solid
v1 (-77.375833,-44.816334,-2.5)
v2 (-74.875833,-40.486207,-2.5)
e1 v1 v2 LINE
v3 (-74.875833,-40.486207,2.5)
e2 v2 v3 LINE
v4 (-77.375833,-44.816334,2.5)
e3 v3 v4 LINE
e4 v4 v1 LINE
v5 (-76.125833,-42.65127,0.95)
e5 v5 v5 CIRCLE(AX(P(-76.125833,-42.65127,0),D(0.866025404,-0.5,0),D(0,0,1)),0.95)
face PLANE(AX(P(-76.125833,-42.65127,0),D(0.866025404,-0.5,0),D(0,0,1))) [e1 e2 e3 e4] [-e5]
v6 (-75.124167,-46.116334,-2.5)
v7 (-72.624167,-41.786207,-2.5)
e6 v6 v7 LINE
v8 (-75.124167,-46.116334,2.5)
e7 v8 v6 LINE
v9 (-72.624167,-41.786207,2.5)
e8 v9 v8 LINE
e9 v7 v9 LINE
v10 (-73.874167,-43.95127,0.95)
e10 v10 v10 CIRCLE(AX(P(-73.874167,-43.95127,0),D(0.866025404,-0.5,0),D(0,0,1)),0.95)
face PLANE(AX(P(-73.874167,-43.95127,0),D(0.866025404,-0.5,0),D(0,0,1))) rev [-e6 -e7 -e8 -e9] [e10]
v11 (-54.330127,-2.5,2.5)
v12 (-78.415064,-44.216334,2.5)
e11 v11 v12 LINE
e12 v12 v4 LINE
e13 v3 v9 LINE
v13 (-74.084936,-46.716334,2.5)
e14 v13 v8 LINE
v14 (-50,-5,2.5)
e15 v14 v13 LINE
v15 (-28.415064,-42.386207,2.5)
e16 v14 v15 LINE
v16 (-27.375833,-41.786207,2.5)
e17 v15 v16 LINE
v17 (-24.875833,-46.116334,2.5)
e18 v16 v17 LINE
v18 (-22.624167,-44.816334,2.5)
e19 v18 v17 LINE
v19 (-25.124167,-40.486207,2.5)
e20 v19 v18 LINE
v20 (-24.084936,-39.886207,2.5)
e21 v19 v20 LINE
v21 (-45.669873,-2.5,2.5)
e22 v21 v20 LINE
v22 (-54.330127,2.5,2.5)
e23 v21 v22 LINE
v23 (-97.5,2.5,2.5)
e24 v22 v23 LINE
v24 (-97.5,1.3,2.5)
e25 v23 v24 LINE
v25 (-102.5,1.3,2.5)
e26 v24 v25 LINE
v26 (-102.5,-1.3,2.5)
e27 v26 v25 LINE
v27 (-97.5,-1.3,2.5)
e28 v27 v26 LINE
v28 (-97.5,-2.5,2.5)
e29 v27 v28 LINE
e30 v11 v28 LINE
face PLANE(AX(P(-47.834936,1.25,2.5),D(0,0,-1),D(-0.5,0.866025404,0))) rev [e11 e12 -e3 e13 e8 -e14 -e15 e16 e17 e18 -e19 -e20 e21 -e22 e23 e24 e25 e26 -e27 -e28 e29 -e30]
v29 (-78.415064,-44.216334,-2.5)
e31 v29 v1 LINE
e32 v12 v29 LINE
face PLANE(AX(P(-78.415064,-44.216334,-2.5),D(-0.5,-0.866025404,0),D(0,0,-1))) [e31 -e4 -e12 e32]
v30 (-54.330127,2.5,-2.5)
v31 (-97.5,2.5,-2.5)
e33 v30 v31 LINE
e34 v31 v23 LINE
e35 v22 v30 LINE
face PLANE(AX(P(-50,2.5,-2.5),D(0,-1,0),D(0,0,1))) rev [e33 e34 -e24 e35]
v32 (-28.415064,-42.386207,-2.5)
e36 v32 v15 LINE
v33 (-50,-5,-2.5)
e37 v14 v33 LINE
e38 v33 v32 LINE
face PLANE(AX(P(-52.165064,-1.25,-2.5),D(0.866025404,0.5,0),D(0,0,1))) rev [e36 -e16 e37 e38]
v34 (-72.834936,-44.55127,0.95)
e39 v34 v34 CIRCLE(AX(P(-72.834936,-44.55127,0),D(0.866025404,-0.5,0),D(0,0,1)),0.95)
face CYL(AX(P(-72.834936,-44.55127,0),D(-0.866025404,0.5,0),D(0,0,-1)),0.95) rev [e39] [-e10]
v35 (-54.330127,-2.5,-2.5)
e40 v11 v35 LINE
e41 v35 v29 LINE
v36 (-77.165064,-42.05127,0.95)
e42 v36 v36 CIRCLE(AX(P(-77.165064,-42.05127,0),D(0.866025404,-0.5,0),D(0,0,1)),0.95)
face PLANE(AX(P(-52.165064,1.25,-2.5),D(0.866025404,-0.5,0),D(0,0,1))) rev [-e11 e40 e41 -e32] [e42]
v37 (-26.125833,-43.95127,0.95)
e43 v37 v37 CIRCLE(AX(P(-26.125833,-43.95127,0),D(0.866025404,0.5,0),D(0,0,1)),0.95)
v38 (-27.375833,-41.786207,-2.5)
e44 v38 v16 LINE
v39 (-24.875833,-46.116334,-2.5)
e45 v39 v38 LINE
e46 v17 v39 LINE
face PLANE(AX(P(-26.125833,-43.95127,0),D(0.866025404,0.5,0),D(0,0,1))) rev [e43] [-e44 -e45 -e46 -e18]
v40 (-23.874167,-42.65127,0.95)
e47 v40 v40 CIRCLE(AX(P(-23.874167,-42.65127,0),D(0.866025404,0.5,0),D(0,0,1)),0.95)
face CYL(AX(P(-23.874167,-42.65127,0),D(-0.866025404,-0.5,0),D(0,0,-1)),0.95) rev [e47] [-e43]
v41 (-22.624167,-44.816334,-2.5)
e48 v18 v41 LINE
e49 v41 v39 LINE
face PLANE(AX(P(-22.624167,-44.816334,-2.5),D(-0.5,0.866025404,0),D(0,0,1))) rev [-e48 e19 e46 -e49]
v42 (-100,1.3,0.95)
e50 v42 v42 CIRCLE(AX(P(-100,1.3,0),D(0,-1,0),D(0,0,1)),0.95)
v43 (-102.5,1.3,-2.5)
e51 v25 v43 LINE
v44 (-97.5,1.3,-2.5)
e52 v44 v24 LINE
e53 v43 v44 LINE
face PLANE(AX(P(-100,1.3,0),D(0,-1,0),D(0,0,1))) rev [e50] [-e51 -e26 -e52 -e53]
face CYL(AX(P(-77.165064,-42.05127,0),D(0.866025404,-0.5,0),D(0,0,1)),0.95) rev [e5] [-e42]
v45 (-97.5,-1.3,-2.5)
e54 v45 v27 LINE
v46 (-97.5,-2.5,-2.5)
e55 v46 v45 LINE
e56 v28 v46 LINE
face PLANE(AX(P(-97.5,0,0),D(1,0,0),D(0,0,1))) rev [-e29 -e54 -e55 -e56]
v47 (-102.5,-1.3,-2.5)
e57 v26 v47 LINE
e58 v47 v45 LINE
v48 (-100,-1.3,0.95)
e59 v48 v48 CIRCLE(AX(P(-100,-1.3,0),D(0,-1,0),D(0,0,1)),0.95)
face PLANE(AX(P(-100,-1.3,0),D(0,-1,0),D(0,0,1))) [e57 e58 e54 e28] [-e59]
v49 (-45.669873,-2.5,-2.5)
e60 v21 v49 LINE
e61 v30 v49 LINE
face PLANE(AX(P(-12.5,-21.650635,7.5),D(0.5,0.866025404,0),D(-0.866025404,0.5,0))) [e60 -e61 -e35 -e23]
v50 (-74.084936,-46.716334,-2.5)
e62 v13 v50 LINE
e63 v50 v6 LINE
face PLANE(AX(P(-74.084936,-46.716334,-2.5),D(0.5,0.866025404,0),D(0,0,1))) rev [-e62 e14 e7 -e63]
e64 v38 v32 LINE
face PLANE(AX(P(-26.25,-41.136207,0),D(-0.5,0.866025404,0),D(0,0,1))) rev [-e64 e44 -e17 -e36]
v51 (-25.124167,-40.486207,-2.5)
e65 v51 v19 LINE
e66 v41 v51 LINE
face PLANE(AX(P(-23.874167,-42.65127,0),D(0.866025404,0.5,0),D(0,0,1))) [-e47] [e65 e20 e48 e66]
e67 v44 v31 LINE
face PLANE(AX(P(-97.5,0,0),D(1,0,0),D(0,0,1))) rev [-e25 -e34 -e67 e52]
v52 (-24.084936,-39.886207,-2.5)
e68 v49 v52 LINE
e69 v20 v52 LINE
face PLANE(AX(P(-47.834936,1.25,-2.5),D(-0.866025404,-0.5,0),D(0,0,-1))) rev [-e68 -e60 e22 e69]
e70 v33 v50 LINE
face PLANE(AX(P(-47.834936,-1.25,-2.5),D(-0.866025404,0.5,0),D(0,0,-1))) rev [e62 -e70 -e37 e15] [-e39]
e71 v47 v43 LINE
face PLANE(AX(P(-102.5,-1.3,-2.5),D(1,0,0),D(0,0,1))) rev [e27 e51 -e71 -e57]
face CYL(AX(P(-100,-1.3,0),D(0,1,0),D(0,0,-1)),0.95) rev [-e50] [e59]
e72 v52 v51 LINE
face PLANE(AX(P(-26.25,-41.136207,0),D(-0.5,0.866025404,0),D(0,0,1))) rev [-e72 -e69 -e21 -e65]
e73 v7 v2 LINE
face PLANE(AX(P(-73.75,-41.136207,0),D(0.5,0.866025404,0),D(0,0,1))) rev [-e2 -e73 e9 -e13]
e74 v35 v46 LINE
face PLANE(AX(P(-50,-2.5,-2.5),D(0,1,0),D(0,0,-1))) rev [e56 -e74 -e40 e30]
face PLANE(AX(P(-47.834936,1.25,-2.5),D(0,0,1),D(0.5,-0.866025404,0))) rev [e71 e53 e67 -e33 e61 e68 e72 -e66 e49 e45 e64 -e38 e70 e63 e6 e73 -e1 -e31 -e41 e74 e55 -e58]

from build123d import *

# Parameters (mm, degrees)
SKETCH1_W               = 5
SKETCH1_H               = 5
SKETCH1_R               = 0.95
CENTER_DEPTH            = 1.3
RIGHTSIDE_START         = 1.3
SKETCH1_2_W             = 5
SKETCH1_2_H             = 5
SKETCH1_2_R             = 0.95
RIGHTSIDE_DEPTH         = 1.2
LEFTSIDE_START          = -1.3
SKETCH1_3_W             = 5
SKETCH1_3_H             = 5
SKETCH1_3_R             = 0.95
LEFTSIDE_DEPTH          = 1.2
SKETCH3_W               = 5
SKETCH3_H               = 5
BOSS_EXTRUDE4_DEPTH     = 47.5
CUT_EXTRUDE1_DEPTH      = 5
CIRPATTERN2_COUNT       = 6
CIRPATTERN3_COUNT       = 3
CIRPATTERN4_START       = -44.601270189
CIRPATTERN4_OUTLINE_W   = 5
CIRPATTERN4_OUTLINE_H   = 5
CIRPATTERN4_OUTLINE_R   = 0.95
CIRPATTERN4_DEPTH       = 2.6
CIRPATTERN4_2_OUTLINE_W = 5
CIRPATTERN4_2_OUTLINE_H = 5
CIRPATTERN4_2_OUTLINE_R = 0.95
CIRPATTERN4_2_DEPTH     = 2.6
CIRPATTERN4_START_2     = -1.3
CIRPATTERN4_3_OUTLINE_W = 5
CIRPATTERN4_3_OUTLINE_H = 5
CIRPATTERN4_3_OUTLINE_R = 0.95
CIRPATTERN4_3_DEPTH     = 2.6
SKETCH5_W               = 5
SKETCH5_H               = 2.6
CUT_EXTRUDE2_DEPTH      = 5


# Read off the part's stored shape, not the designer's step: CirPattern4
with BuildPart() as part:
    # Sketch1 → Center (new, symmetric)
    with BuildSketch(Plane(origin=(0, 0, 0), x_dir=(1, 0, 0), z_dir=(0, 1, 0))):
        Rectangle(SKETCH1_W, SKETCH1_H)
        with Locations(Location((0, 0, 0), (0, 0, 270))):
            Circle(SKETCH1_R, mode=Mode.SUBTRACT)
    extrude(amount=CENTER_DEPTH, both=True)

    # Sketch5 → Cut-Extrude2 (cut)
    with BuildSketch(Plane(origin=(2.5, 0, 0), x_dir=(0, 0, -1), z_dir=(1, 0, 0))):
        Rectangle(SKETCH5_W, SKETCH5_H)
    extrude(amount=-CUT_EXTRUDE2_DEPTH, mode=Mode.SUBTRACT)


with BuildPart() as body_2:
    # Sketch1<2> → RightSide (new body)
    with BuildSketch(Plane(origin=(0, 0, 0), x_dir=(1, 0, 0), z_dir=(0, 1, 0)).offset(RIGHTSIDE_START)):
        Rectangle(SKETCH1_2_W, SKETCH1_2_H)
        with Locations(Location((0, 0, 0), (0, 0, 270))):
            Circle(SKETCH1_2_R, mode=Mode.SUBTRACT)
    extrude(amount=RIGHTSIDE_DEPTH)


with BuildPart() as body_3:
    # Sketch1<3> → LeftSide (new body)
    with BuildSketch(Plane(origin=(0, 0, 0), x_dir=(1, 0, 0), z_dir=(0, 1, 0)).offset(LEFTSIDE_START)):
        Rectangle(SKETCH1_3_W, SKETCH1_3_H)
        with Locations(Location((0, 0, 0), (0, 0, 270))):
            Circle(SKETCH1_3_R, mode=Mode.SUBTRACT)
    extrude(amount=-LEFTSIDE_DEPTH)


with BuildPart() as body_4:
    # Sketch3 → Boss-Extrude4 (new body)
    with BuildSketch(Plane.ZY.offset(2.5)):
        Rectangle(SKETCH3_W, SKETCH3_H)
    extrude(amount=BOSS_EXTRUDE4_DEPTH)

    # Sketch4 → Cut-Extrude1 (cut)
    with BuildSketch(Plane.XY.offset(-2.5)):
        Polygon((-50, 0), (-50, -2.5), (-45.669872981, -2.5), align=None)
        Polygon((-50, 2.5), (-50, 0), (-45.669872981, 2.5), align=None)
    extrude(amount=CUT_EXTRUDE1_DEPTH, mode=Mode.SUBTRACT)


with BuildPart() as cirpattern2_1:
    # CirPattern2: pattern copy
    add(body_4.part.rotate(Axis((-50, 0, 0), (0, 0, 1)), 1 * 360 / CIRPATTERN2_COUNT))


with BuildPart() as cirpattern2_2:
    # CirPattern2: pattern copy
    add(body_4.part.rotate(Axis((-50, 0, 0), (0, 0, 1)), 2 * 360 / CIRPATTERN2_COUNT))


with BuildPart() as cirpattern2_3:
    # CirPattern2: pattern copy
    add(body_4.part.rotate(Axis((-50, 0, 0), (0, 0, 1)), 3 * 360 / CIRPATTERN2_COUNT))


with BuildPart() as cirpattern2_4:
    # CirPattern2: pattern copy
    add(body_4.part.rotate(Axis((-50, 0, 0), (0, 0, 1)), 4 * 360 / CIRPATTERN2_COUNT))


with BuildPart() as cirpattern2_5:
    # CirPattern2: pattern copy
    add(body_4.part.rotate(Axis((-50, 0, 0), (0, 0, 1)), 5 * 360 / CIRPATTERN2_COUNT))


with BuildPart() as cirpattern3_1:
    # CirPattern3: pattern copy
    add(body_3.part.rotate(Axis((-50, 0, 0), (0, 0, 1)), 1 * 360 / CIRPATTERN3_COUNT))


with BuildPart() as cirpattern3_2:
    # CirPattern3: pattern copy
    add(body_3.part.rotate(Axis((-50, 0, 0), (0, 0, 1)), 2 * 360 / CIRPATTERN3_COUNT))


with BuildPart() as cirpattern3_3:
    # CirPattern3: pattern copy
    add(body_2.part.rotate(Axis((-50, 0, 0), (0, 0, 1)), 1 * 360 / CIRPATTERN3_COUNT))


with BuildPart() as cirpattern3_4:
    # CirPattern3: pattern copy
    add(body_2.part.rotate(Axis((-50, 0, 0), (0, 0, 1)), 2 * 360 / CIRPATTERN3_COUNT))


with BuildPart() as body_14:
    # CirPattern4 outline → CirPattern4 (new body)
    with BuildSketch(Plane(origin=(0, 0, 0), x_dir=(0.49999999999999767, 0.86602540378444, 0), z_dir=(0.8660254037844399, -0.49999999999999795, 0)).offset(CIRPATTERN4_START)):
        with Locations((25, 0)):
            Rectangle(CIRPATTERN4_OUTLINE_W, CIRPATTERN4_OUTLINE_H)
        with Locations((25, 0)):
            Circle(CIRPATTERN4_OUTLINE_R, mode=Mode.SUBTRACT)
    extrude(amount=CIRPATTERN4_DEPTH)


with BuildPart() as body_15:
    # CirPattern4 2 outline → CirPattern4 2 (new body)
    with BuildSketch(Plane(origin=(0, 0, 0), x_dir=(0.5000000000000098, -0.8660254037844329, 0), z_dir=(0.8660254037844329, 0.50000000000001, 0)).offset(CIRPATTERN4_START)):
        with Locations((25, 0)):
            Rectangle(CIRPATTERN4_2_OUTLINE_W, CIRPATTERN4_2_OUTLINE_H)
        with Locations((25, 0)):
            Circle(CIRPATTERN4_2_OUTLINE_R, mode=Mode.SUBTRACT)
    extrude(amount=CIRPATTERN4_2_DEPTH)


with BuildPart() as body_16:
    # CirPattern4 3 outline → CirPattern4 3 (new body)
    with BuildSketch(Plane(origin=(0, 0, 0), x_dir=(1, 0, 0), z_dir=(0, 1, 0)).offset(CIRPATTERN4_START_2)):
        with Locations((-100, 0)):
            Rectangle(CIRPATTERN4_3_OUTLINE_W, CIRPATTERN4_3_OUTLINE_H)
        with Locations((-100, 0)):
            Circle(CIRPATTERN4_3_OUTLINE_R, mode=Mode.SUBTRACT)
    extrude(amount=CIRPATTERN4_3_DEPTH)


with BuildPart() as cirpattern2_5_1:
    add(cirpattern2_5.part)

    # Combine1: union CirPattern2_3, CirPattern2_4, body 16, CirPattern3_2, CirPattern3_4, body 15
    add(cirpattern2_3.part)
    add(cirpattern2_4.part)
    add(body_16.part)
    add(cirpattern3_2.part)
    add(cirpattern3_4.part)
    add(body_15.part)

    # Combine3: cut CirPattern3_3, body 14, CirPattern2_1, body 4, body 2, CirPattern2_2, body 3, CirPattern3_1
    add(cirpattern3_3.part, mode=Mode.SUBTRACT)
    add(body_14.part, mode=Mode.SUBTRACT)
    add(cirpattern2_1.part, mode=Mode.SUBTRACT)
    add(body_4.part, mode=Mode.SUBTRACT)
    add(body_2.part, mode=Mode.SUBTRACT)
    add(cirpattern2_2.part, mode=Mode.SUBTRACT)
    add(body_3.part, mode=Mode.SUBTRACT)
    add(cirpattern3_1.part, mode=Mode.SUBTRACT)


solid = cirpattern2_5_1.part
